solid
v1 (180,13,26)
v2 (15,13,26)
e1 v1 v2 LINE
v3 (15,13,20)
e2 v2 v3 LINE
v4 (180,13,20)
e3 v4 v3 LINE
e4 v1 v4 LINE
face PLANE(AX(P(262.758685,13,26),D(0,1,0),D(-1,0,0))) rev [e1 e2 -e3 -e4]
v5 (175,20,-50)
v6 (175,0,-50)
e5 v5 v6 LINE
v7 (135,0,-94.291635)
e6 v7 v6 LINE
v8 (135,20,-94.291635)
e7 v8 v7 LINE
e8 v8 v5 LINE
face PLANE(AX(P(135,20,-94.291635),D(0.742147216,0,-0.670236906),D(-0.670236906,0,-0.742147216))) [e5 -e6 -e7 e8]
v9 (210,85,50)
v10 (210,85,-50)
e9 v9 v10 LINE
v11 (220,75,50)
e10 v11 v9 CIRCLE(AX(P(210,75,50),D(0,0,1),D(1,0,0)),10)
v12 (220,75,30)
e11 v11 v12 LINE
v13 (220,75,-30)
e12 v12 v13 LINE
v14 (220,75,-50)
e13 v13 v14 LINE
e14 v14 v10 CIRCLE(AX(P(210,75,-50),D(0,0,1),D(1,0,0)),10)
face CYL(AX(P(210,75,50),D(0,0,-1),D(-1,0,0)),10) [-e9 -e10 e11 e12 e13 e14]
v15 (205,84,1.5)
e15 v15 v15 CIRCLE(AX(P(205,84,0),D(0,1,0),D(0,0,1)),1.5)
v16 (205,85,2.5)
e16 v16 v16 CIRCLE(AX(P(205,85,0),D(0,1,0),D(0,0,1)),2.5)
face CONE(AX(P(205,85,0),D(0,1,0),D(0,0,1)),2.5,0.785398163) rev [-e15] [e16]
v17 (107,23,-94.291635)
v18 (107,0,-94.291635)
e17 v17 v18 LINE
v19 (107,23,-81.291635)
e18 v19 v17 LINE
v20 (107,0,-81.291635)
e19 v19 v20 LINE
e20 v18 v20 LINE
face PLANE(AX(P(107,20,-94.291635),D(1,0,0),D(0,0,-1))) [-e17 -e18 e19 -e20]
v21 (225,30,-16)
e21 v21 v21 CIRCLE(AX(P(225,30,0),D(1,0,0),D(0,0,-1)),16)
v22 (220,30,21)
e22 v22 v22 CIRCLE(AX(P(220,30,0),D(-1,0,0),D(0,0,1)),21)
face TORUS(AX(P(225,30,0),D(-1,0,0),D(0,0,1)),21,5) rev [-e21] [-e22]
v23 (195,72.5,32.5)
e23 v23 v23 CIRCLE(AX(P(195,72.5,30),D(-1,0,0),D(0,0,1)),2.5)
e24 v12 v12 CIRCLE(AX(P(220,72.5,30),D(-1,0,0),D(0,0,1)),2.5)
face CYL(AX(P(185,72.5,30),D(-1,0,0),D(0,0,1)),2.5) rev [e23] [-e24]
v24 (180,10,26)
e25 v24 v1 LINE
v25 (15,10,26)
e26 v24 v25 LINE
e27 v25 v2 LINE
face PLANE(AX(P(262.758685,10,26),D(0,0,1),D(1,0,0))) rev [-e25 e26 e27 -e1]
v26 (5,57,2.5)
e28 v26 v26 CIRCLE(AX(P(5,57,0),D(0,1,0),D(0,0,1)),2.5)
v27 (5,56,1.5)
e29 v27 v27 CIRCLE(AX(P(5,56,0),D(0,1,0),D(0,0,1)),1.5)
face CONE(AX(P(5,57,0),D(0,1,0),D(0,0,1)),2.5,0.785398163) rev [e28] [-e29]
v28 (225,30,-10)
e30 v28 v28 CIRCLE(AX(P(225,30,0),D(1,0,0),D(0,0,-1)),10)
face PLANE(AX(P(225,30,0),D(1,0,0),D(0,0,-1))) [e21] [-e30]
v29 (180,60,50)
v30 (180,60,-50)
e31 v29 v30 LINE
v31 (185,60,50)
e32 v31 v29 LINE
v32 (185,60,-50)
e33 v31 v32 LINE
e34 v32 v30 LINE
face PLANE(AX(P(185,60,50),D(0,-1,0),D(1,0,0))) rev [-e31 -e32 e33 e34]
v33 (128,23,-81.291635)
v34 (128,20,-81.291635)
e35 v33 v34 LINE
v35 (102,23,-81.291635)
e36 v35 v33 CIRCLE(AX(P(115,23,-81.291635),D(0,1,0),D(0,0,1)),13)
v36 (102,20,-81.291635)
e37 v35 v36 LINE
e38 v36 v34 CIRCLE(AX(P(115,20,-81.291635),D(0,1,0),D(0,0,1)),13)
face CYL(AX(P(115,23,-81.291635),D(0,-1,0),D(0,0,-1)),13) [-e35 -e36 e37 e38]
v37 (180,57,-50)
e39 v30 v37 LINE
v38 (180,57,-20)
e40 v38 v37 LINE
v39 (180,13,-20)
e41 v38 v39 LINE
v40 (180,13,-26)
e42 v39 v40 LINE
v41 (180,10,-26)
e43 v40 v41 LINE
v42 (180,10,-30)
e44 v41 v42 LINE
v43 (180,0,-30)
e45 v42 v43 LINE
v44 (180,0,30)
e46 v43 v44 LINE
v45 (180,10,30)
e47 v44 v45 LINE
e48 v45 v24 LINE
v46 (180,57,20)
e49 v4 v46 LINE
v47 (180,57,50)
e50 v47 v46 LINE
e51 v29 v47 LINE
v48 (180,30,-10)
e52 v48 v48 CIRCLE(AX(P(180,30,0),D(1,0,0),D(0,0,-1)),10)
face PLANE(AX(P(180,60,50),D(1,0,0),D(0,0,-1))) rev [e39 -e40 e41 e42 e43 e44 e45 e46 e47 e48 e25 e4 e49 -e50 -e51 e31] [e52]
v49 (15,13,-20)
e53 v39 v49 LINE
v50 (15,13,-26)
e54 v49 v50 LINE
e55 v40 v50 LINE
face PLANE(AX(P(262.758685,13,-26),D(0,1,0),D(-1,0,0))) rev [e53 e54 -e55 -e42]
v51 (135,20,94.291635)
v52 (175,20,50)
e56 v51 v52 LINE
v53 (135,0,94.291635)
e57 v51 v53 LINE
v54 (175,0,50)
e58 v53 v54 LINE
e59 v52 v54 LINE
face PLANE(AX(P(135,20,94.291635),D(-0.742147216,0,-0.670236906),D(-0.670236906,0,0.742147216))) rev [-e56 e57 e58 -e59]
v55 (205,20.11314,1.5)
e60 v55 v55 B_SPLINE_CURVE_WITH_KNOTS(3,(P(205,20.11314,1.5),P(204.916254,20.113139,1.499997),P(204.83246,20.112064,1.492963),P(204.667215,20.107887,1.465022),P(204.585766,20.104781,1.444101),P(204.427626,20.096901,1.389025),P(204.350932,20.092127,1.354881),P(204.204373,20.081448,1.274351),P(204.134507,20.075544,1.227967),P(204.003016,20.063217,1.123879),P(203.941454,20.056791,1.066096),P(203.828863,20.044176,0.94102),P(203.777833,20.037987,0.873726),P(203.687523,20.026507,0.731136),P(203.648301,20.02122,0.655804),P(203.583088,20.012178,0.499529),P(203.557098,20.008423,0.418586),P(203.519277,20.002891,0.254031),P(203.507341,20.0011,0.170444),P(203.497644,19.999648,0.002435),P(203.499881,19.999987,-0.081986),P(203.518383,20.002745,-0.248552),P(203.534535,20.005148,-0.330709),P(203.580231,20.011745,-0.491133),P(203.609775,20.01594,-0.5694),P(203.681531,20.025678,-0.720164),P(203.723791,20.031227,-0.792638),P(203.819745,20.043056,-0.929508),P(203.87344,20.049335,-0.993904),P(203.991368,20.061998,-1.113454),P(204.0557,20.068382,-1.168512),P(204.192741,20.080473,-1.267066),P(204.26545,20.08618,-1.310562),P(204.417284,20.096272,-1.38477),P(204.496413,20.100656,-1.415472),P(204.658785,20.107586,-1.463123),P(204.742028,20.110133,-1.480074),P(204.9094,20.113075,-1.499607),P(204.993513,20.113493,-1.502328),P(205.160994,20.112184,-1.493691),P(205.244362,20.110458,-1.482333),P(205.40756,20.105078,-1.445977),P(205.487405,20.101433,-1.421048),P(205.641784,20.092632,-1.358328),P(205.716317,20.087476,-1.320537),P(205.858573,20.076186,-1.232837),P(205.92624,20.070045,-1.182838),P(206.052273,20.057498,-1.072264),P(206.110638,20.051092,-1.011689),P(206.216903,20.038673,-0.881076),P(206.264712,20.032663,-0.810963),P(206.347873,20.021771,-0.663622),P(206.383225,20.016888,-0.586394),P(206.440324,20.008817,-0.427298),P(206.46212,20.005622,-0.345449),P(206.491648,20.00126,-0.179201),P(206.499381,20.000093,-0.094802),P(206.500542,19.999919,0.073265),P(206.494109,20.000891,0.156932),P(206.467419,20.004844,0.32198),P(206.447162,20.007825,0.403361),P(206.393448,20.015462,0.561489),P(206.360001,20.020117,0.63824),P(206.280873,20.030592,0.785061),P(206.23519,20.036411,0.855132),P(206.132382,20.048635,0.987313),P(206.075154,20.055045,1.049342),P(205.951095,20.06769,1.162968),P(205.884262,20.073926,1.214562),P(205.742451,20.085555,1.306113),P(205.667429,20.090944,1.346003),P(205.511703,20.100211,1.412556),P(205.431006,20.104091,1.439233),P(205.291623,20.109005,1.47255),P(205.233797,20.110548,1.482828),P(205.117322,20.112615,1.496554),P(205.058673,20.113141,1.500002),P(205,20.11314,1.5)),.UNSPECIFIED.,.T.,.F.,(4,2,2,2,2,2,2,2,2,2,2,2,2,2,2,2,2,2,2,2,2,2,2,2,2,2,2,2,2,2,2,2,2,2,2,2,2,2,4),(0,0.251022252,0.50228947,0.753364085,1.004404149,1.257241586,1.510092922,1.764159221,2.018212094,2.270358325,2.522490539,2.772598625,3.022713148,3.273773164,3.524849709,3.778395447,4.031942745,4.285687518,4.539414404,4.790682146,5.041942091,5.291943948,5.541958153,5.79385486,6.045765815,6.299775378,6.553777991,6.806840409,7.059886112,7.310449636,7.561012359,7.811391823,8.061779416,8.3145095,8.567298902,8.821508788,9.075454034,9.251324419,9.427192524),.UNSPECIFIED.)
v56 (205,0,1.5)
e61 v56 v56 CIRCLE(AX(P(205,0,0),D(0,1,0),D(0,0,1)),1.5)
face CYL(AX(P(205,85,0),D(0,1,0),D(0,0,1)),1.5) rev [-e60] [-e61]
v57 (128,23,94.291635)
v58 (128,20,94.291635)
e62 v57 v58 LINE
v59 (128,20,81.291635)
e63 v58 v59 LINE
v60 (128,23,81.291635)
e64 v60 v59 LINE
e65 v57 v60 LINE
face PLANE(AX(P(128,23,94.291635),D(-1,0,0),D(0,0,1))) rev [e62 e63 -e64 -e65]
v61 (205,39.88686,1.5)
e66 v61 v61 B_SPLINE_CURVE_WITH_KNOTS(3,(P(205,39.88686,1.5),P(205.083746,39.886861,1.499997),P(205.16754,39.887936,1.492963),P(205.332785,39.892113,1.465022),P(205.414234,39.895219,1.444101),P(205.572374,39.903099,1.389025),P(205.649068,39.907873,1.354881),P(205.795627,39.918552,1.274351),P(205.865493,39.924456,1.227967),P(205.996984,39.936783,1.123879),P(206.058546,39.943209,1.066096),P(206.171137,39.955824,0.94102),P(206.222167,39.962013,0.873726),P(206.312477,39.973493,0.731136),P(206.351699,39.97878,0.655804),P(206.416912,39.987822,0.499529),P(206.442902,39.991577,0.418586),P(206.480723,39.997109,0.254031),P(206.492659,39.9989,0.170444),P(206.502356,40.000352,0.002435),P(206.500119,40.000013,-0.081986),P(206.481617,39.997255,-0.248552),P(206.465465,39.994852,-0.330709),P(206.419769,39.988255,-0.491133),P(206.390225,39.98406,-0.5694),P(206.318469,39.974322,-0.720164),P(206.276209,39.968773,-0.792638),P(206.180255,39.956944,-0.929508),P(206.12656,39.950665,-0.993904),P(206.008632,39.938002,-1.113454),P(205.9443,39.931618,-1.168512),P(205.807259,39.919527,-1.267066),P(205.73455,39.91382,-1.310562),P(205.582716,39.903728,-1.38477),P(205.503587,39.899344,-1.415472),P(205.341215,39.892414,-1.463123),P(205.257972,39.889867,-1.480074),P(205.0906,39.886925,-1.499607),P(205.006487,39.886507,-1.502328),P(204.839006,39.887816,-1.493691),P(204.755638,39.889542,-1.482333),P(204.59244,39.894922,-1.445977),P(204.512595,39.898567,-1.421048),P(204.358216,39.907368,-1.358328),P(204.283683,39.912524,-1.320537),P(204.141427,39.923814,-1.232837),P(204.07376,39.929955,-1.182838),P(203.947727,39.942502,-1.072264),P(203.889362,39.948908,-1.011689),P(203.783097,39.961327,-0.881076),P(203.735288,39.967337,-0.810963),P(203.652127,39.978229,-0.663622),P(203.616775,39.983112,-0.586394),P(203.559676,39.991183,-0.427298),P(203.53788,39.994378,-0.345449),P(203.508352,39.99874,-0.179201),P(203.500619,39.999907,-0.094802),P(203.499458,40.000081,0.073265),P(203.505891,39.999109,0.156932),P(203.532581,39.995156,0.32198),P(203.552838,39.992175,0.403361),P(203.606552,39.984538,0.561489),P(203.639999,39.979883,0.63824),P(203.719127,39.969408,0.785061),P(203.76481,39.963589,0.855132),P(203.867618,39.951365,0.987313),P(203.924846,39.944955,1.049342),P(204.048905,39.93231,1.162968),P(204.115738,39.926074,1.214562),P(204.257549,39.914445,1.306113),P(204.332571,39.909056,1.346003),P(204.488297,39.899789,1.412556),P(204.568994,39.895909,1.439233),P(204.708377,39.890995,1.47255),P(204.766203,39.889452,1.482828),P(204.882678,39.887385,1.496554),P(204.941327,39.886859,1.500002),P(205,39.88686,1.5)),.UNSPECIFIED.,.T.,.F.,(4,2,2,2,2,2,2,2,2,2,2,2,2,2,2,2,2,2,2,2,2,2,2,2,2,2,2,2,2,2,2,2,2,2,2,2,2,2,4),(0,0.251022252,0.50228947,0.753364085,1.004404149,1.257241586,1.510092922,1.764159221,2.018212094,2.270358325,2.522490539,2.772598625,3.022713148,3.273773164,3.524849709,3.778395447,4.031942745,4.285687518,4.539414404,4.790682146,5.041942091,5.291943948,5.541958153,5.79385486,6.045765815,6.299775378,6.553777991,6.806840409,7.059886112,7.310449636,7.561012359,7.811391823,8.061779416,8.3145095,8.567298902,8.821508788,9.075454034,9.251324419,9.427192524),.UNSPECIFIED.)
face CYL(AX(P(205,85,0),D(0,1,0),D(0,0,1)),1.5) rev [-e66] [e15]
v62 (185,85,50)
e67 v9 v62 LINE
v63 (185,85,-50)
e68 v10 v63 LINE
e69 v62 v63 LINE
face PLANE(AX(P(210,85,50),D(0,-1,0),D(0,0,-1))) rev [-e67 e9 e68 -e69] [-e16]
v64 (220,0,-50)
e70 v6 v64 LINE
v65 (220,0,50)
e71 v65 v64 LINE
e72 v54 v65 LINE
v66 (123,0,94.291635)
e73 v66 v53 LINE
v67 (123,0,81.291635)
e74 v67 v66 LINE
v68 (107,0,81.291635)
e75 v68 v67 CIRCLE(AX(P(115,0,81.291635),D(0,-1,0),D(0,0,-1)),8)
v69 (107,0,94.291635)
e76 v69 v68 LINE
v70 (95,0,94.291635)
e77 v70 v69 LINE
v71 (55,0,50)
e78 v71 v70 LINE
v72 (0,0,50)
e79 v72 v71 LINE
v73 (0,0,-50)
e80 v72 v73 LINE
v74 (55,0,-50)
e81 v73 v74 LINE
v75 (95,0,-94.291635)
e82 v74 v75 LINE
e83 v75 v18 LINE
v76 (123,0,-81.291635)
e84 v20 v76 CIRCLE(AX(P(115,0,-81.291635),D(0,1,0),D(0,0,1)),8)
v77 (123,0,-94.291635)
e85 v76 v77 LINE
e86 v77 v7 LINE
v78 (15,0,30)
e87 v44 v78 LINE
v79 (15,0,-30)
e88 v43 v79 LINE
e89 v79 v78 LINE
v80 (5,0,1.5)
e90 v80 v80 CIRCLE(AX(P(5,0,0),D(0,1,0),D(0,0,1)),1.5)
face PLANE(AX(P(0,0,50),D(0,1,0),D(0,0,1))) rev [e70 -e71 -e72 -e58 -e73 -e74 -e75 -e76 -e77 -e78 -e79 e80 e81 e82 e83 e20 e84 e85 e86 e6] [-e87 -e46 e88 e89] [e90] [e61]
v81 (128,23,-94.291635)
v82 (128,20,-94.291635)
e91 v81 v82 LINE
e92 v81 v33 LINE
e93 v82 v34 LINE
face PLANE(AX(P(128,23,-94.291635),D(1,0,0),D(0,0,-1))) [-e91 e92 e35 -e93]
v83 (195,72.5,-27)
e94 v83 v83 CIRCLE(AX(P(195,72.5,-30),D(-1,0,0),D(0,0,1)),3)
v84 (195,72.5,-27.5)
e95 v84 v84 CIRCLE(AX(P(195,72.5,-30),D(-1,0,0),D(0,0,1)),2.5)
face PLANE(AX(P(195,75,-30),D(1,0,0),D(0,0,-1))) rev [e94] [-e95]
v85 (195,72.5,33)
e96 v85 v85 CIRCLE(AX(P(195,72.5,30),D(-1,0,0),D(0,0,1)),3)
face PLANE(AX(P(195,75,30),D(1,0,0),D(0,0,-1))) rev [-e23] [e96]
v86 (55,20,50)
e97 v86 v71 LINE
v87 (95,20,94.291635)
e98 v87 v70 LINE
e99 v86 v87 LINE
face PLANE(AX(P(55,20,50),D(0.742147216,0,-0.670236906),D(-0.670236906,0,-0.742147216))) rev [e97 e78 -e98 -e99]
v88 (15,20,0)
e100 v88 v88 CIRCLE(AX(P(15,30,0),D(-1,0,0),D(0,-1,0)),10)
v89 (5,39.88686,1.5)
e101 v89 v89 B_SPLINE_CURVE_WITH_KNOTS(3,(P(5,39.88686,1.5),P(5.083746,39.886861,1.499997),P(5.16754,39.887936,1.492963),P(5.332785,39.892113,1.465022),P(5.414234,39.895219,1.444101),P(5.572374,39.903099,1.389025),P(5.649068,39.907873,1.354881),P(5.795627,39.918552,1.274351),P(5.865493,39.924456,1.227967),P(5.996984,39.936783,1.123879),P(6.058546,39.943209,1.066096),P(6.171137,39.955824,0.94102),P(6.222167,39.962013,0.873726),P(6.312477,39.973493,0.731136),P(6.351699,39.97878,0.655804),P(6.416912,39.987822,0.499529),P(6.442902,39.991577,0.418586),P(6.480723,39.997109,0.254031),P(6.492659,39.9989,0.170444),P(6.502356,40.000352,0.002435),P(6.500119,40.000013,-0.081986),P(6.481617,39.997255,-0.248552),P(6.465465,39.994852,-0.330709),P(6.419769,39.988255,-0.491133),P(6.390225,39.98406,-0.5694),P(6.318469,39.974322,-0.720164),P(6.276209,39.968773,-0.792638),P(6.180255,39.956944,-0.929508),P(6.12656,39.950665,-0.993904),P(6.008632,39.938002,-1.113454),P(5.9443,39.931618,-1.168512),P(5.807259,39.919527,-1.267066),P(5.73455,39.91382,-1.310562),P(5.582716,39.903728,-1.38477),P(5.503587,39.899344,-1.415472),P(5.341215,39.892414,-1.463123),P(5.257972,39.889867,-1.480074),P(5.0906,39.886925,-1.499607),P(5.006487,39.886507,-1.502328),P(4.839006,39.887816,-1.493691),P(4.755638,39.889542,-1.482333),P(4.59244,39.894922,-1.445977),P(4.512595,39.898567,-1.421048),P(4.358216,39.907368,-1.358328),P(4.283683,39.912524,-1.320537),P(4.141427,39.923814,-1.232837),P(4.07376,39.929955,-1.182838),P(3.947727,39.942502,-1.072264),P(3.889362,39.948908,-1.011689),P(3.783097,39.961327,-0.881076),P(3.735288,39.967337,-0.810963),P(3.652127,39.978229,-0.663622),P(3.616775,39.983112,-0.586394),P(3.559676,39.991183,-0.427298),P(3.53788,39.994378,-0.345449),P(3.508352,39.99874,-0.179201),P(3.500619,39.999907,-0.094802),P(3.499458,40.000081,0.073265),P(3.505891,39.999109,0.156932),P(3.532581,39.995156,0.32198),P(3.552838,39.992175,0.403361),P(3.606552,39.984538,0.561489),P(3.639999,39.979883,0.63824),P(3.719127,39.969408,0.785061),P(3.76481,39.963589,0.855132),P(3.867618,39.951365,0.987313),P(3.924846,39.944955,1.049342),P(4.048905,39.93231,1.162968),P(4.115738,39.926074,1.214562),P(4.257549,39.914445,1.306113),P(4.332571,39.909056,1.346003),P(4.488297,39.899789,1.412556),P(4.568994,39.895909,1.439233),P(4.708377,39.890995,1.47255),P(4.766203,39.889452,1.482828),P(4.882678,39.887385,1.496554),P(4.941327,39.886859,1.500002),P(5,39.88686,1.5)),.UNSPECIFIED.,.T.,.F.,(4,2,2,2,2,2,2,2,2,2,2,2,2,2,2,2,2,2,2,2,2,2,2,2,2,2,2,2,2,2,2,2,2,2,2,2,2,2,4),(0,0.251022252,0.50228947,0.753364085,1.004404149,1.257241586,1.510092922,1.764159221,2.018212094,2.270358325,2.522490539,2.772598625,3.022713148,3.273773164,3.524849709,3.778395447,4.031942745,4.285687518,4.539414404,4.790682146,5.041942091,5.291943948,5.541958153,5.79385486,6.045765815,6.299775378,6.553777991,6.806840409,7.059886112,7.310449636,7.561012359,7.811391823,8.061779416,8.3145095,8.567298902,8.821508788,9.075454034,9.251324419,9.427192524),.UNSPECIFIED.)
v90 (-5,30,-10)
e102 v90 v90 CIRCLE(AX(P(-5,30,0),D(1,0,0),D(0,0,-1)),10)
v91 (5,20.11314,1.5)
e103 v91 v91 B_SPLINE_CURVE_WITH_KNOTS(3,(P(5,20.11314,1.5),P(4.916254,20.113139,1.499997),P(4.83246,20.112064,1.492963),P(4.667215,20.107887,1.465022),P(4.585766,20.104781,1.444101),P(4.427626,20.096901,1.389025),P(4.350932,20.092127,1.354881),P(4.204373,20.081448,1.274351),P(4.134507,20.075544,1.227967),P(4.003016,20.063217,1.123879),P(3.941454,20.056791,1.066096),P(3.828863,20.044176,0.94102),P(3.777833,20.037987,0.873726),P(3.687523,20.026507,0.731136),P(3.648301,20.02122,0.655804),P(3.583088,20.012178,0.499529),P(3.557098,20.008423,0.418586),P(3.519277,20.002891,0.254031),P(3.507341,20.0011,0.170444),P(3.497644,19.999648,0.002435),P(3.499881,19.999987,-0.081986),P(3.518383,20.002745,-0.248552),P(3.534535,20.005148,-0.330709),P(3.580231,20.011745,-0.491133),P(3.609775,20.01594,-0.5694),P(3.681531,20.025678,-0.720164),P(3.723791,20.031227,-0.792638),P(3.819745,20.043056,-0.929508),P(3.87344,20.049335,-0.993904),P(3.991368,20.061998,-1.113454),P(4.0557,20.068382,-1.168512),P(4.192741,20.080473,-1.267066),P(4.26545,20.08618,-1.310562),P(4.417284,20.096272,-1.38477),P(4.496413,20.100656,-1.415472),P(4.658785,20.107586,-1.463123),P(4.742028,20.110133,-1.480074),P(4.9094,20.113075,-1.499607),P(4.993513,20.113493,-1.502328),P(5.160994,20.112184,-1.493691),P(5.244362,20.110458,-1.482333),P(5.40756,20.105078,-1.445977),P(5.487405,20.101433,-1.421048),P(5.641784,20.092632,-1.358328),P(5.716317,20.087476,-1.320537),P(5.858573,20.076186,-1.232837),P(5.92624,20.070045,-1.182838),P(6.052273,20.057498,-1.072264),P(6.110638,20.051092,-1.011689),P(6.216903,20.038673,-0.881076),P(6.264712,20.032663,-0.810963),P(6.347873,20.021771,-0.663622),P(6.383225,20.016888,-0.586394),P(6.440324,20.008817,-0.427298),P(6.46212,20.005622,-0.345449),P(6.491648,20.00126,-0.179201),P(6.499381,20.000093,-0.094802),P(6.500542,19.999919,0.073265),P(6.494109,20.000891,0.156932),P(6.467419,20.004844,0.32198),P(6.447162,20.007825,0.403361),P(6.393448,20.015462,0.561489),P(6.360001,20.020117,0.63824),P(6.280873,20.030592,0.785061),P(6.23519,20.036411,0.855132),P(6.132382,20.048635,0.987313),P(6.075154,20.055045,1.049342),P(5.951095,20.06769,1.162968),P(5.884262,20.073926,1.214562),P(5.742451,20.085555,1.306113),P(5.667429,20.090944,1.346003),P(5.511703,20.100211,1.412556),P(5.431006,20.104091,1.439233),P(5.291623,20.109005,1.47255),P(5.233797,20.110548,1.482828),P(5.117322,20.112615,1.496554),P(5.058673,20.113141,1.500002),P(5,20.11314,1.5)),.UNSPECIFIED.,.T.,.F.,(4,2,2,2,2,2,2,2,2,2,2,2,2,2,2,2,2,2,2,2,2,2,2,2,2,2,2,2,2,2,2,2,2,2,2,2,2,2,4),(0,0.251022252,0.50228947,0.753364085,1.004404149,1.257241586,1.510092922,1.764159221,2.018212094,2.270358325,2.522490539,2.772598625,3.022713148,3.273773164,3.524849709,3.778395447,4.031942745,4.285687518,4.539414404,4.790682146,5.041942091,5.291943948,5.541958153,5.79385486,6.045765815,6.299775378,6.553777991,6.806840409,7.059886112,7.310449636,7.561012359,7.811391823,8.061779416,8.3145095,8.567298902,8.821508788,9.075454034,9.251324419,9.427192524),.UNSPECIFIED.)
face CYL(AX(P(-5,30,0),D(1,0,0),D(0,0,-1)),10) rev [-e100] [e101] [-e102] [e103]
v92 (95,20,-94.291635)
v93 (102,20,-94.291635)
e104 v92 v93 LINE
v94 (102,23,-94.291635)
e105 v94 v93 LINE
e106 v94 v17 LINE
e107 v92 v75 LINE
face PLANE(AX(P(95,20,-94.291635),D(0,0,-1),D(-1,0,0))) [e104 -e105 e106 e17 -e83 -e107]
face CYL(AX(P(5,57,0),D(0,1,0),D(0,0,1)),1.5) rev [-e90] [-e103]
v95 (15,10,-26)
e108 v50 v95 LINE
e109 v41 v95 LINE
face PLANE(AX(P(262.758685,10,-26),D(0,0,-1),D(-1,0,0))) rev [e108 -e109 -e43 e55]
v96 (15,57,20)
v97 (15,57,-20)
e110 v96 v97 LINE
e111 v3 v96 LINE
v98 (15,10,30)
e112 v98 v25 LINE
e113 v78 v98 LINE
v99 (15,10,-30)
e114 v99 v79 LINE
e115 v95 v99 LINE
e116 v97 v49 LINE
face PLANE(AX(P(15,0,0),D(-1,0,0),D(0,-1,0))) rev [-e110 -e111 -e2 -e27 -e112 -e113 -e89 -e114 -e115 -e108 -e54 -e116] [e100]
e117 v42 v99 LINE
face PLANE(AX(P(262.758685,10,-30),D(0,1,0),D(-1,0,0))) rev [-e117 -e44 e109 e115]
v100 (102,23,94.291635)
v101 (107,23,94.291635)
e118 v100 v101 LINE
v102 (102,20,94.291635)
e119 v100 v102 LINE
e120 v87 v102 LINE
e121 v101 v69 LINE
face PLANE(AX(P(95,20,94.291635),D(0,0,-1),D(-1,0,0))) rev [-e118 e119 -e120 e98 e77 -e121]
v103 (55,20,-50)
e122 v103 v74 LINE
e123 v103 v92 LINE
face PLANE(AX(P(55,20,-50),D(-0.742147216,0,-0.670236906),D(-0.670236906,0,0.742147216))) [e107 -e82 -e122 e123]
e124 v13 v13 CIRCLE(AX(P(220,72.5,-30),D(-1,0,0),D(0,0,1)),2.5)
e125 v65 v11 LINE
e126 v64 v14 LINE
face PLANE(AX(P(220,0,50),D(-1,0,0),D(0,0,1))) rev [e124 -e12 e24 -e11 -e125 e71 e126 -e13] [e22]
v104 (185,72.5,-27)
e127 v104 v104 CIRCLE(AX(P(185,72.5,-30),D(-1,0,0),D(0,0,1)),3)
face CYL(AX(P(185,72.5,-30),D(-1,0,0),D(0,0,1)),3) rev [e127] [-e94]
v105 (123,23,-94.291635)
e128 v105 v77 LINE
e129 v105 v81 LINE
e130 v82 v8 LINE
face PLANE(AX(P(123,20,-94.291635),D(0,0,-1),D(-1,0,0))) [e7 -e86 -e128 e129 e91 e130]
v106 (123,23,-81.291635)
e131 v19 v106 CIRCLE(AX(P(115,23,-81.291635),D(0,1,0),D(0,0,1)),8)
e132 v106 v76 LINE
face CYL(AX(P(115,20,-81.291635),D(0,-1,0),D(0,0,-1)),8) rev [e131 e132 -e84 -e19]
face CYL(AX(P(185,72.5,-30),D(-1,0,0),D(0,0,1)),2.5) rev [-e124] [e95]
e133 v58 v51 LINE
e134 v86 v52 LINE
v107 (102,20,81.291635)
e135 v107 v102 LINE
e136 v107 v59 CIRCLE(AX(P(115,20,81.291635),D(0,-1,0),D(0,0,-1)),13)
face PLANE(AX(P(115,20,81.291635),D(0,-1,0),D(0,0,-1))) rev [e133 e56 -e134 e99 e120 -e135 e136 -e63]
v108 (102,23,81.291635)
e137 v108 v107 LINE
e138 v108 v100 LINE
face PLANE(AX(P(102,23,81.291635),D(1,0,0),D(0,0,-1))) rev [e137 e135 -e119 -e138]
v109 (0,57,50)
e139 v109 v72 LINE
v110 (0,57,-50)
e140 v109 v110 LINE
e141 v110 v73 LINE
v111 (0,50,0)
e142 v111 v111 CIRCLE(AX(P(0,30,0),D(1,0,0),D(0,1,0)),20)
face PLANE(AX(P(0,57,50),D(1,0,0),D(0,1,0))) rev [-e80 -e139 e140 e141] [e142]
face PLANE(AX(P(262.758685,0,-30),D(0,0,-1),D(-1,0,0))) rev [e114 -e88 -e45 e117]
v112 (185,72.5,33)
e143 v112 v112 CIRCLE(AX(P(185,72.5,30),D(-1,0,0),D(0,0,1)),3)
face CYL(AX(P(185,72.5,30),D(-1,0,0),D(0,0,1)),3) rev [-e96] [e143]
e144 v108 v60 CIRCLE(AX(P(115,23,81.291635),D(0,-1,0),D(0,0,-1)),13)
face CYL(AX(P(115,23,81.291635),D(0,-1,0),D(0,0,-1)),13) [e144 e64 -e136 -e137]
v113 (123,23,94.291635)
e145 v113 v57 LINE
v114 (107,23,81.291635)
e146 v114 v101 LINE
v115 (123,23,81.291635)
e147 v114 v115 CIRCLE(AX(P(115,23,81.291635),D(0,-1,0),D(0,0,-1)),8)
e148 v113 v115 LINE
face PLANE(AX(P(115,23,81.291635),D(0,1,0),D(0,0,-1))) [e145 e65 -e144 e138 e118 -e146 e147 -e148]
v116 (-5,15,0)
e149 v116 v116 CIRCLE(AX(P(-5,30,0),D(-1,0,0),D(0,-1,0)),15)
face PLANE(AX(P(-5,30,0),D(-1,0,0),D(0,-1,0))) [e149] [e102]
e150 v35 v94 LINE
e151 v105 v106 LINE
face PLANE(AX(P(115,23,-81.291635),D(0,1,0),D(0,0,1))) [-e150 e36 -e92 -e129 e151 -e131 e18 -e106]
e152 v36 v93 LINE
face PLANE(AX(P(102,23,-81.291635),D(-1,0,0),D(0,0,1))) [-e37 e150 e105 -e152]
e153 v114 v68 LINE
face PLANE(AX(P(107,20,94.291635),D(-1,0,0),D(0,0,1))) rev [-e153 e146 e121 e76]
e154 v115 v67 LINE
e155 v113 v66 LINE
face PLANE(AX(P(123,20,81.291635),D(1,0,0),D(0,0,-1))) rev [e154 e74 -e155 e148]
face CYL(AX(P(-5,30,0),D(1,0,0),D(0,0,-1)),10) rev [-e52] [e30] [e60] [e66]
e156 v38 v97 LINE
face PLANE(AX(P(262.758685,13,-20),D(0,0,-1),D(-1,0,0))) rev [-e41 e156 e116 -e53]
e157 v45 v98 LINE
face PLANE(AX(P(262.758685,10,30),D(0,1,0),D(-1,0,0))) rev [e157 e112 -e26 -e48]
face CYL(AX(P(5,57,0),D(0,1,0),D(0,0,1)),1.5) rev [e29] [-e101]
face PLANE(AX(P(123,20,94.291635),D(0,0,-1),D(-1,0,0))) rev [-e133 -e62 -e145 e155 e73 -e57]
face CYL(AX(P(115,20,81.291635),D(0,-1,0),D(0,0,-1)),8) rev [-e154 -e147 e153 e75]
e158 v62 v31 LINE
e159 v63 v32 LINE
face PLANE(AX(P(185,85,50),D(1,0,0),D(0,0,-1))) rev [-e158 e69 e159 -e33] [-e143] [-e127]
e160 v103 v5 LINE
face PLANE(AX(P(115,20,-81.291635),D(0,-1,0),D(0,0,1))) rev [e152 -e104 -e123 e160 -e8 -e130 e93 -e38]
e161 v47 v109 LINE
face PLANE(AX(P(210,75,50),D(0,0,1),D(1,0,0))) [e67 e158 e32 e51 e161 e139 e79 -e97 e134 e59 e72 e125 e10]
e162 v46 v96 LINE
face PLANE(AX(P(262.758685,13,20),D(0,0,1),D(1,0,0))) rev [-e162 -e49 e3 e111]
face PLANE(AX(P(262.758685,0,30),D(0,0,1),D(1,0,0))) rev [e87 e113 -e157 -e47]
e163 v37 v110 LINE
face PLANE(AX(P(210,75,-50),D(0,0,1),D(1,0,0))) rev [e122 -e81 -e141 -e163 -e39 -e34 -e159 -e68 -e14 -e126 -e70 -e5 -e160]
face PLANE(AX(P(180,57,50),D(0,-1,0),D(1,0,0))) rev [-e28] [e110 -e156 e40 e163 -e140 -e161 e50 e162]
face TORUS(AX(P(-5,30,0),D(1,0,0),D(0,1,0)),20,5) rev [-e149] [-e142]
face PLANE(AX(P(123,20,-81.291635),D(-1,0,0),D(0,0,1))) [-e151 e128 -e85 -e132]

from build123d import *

# Parameters (mm, degrees)
BOSS_EXTRUDE1_DEPTH = 50
CUT_EXTRUDE1_START  = -15
CUT_EXTRUDE1_DEPTH  = 165
SKETCH3_R           = 15
BOSS_EXTRUDE2_DEPTH = 5
SKETCH4_R           = 16
BOSS_EXTRUDE3_DEPTH = 5
SKETCH5_R           = 10
CUT_EXTRUDE2_DEPTH  = 251.249875125
FILLET1_R           = 5
HOLE1_D             = 5
HOLE1_DEPTH         = 40
HOLE1_CBORE_D       = 6
HOLE1_CBORE_DEPTH   = 10
HOLE1_TIP           = 1.502151548
HOLE2_D             = 3
HOLE2_CSINK_D       = 5
HOLE2_CSINK_ANGLE   = 90
HOLE4_D             = 3
HOLE4_CSINK_D       = 5
HOLE4_CSINK_ANGLE   = 90
BOSS_EXTRUDE7_DEPTH = 20
BOSS_EXTRUDE9_DEPTH = 3


with BuildPart() as part:
    # Sketch1 → Boss-Extrude1 (new, symmetric)
    with BuildSketch(Plane.XY):
        with BuildLine():
            Line((0, 0), (220, 0))
            Line((220, 0), (220, 75))
            ThreePointArc((220, 75), (217.071067812, 82.071067812), (210, 85))
            Line((210, 85), (185, 85))
            Line((185, 85), (185, 60))
            Line((185, 60), (180, 60))
            Line((180, 60), (180, 57))
            Line((180, 57), (0, 57))
            Line((0, 57), (0, 0))
        make_face()
    extrude(amount=BOSS_EXTRUDE1_DEPTH, both=True)

    # Sketch2 → Cut-Extrude1 (cut)
    with BuildSketch(Plane.ZY.offset(CUT_EXTRUDE1_START)):
        Polygon((-30, 0), (-30, 10), (-26, 10), (-26, 13), (-20, 13), (-20, 57), (20, 57), (20, 13), (26, 13), (26, 10), (30, 10), (30, 0), align=None)
    extrude(amount=-CUT_EXTRUDE1_DEPTH, mode=Mode.SUBTRACT)

    # Sketch3 → Boss-Extrude2 (add)
    with BuildSketch(Plane.ZY):
        with Locations(Location((0, 30, 0), (0, 0, 270))):
            Circle(SKETCH3_R)
    extrude(amount=BOSS_EXTRUDE2_DEPTH)

    # Sketch4 → Boss-Extrude3 (add)
    with BuildSketch(Plane(origin=(220, 0, 0), x_dir=(0, 0, -1), z_dir=(1, 0, 0))):
        with Locations(Location((0, 30, 0), (0, 0, 180))):
            Circle(SKETCH4_R)
    extrude(amount=BOSS_EXTRUDE3_DEPTH)

    # Sketch5 → Cut-Extrude2 (cut, through all)
    with BuildSketch(Plane(origin=(225, 0, 0), x_dir=(0, 0, -1), z_dir=(1, 0, 0))):
        with Locations((0, 30)):
            Circle(SKETCH5_R)
    extrude(amount=-CUT_EXTRUDE2_DEPTH, mode=Mode.SUBTRACT)

    # Fillet1
    fillet1_edges = [part.edges().sort_by_distance(p)[0] for p in [
        (0, 45, 0),
        (220, 30, -16),
    ]]
    fillet(fillet1_edges, radius=FILLET1_R - 0.0001)  # a hair under: the kernel refuses the full size

    # Hole1
    with Locations(Plane(origin=(185, 72.5, -30), x_dir=(0, 0, -1), z_dir=(-1, 0, 0))):
        with Locations((0, 0), (-60, 0)):
            CounterBoreHole(HOLE1_D / 2, HOLE1_CBORE_D / 2, HOLE1_CBORE_DEPTH, depth=HOLE1_DEPTH)
            with Locations((0, 0, -(HOLE1_DEPTH + HOLE1_TIP / 2))):  # 118° drill point
                Cone(0, HOLE1_D / 2, HOLE1_TIP, mode=Mode.SUBTRACT)

    # Hole2 (through all)
    with Locations(Plane(origin=(205, 85, 0), x_dir=(0, 0, 1), z_dir=(0, 1, 0))):
        with Locations((0, 0)):
            CounterSinkHole(HOLE2_D / 2, HOLE2_CSINK_D / 2, counter_sink_angle=HOLE2_CSINK_ANGLE)

    # Hole4 (through all)
    with Locations(Plane(origin=(5, 57, 0), x_dir=(1, 0, 0), z_dir=(0, 1, 0))):
        with Locations((0, 0)):
            CounterSinkHole(HOLE4_D / 2, HOLE4_CSINK_D / 2, counter_sink_angle=HOLE4_CSINK_ANGLE)

    # Sketch18 → Boss-Extrude7 (add)
    with BuildSketch(Plane.XZ):
        with BuildLine():
            Line((55, 50), (95, 94.291635381))
            Line((95, 94.291635381), (107, 94.291635381))
            Line((107, 94.291635381), (107, 81.291635381))
            ThreePointArc((107, 81.291635381), (115, 73.291635381), (123, 81.291635381))
            Line((123, 81.291635381), (123, 94.291635381))
            Line((123, 94.291635381), (135, 94.291635381))
            Line((135, 94.291635381), (175, 50))
            Line((175, 50), (55, 50))
        make_face()
    boss_extrude7 = extrude(amount=-BOSS_EXTRUDE7_DEPTH)

    # Mirror4: Boss-Extrude7 across plane
    add(boss_extrude7.mirror(Plane.XY))

    # Sketch21 → Boss-Extrude9 (add)
    with BuildSketch(Plane(origin=(0, 20, 0), x_dir=(1, 0, 0), z_dir=(0, 1, 0))):
        with BuildLine():
            Line((128, 94.291635381), (128, 81.291635381))
            ThreePointArc((128, 81.291635381), (115, 68.291635381), (102, 81.291635381))
            Line((102, 81.291635381), (102, 94.291635381))
            Line((102, 94.291635381), (107, 94.291635381))
            Line((107, 94.291635381), (107, 81.291635381))
            ThreePointArc((107, 81.291635381), (115, 73.291635381), (123, 81.291635381))
            Line((123, 81.291635381), (123, 94.291635381))
            Line((123, 94.291635381), (128, 94.291635381))
        make_face()
    boss_extrude9 = extrude(amount=BOSS_EXTRUDE9_DEPTH)

    # Mirror5: Boss-Extrude9 across plane
    add(boss_extrude9.mirror(Plane.XY))


solid = part.part
